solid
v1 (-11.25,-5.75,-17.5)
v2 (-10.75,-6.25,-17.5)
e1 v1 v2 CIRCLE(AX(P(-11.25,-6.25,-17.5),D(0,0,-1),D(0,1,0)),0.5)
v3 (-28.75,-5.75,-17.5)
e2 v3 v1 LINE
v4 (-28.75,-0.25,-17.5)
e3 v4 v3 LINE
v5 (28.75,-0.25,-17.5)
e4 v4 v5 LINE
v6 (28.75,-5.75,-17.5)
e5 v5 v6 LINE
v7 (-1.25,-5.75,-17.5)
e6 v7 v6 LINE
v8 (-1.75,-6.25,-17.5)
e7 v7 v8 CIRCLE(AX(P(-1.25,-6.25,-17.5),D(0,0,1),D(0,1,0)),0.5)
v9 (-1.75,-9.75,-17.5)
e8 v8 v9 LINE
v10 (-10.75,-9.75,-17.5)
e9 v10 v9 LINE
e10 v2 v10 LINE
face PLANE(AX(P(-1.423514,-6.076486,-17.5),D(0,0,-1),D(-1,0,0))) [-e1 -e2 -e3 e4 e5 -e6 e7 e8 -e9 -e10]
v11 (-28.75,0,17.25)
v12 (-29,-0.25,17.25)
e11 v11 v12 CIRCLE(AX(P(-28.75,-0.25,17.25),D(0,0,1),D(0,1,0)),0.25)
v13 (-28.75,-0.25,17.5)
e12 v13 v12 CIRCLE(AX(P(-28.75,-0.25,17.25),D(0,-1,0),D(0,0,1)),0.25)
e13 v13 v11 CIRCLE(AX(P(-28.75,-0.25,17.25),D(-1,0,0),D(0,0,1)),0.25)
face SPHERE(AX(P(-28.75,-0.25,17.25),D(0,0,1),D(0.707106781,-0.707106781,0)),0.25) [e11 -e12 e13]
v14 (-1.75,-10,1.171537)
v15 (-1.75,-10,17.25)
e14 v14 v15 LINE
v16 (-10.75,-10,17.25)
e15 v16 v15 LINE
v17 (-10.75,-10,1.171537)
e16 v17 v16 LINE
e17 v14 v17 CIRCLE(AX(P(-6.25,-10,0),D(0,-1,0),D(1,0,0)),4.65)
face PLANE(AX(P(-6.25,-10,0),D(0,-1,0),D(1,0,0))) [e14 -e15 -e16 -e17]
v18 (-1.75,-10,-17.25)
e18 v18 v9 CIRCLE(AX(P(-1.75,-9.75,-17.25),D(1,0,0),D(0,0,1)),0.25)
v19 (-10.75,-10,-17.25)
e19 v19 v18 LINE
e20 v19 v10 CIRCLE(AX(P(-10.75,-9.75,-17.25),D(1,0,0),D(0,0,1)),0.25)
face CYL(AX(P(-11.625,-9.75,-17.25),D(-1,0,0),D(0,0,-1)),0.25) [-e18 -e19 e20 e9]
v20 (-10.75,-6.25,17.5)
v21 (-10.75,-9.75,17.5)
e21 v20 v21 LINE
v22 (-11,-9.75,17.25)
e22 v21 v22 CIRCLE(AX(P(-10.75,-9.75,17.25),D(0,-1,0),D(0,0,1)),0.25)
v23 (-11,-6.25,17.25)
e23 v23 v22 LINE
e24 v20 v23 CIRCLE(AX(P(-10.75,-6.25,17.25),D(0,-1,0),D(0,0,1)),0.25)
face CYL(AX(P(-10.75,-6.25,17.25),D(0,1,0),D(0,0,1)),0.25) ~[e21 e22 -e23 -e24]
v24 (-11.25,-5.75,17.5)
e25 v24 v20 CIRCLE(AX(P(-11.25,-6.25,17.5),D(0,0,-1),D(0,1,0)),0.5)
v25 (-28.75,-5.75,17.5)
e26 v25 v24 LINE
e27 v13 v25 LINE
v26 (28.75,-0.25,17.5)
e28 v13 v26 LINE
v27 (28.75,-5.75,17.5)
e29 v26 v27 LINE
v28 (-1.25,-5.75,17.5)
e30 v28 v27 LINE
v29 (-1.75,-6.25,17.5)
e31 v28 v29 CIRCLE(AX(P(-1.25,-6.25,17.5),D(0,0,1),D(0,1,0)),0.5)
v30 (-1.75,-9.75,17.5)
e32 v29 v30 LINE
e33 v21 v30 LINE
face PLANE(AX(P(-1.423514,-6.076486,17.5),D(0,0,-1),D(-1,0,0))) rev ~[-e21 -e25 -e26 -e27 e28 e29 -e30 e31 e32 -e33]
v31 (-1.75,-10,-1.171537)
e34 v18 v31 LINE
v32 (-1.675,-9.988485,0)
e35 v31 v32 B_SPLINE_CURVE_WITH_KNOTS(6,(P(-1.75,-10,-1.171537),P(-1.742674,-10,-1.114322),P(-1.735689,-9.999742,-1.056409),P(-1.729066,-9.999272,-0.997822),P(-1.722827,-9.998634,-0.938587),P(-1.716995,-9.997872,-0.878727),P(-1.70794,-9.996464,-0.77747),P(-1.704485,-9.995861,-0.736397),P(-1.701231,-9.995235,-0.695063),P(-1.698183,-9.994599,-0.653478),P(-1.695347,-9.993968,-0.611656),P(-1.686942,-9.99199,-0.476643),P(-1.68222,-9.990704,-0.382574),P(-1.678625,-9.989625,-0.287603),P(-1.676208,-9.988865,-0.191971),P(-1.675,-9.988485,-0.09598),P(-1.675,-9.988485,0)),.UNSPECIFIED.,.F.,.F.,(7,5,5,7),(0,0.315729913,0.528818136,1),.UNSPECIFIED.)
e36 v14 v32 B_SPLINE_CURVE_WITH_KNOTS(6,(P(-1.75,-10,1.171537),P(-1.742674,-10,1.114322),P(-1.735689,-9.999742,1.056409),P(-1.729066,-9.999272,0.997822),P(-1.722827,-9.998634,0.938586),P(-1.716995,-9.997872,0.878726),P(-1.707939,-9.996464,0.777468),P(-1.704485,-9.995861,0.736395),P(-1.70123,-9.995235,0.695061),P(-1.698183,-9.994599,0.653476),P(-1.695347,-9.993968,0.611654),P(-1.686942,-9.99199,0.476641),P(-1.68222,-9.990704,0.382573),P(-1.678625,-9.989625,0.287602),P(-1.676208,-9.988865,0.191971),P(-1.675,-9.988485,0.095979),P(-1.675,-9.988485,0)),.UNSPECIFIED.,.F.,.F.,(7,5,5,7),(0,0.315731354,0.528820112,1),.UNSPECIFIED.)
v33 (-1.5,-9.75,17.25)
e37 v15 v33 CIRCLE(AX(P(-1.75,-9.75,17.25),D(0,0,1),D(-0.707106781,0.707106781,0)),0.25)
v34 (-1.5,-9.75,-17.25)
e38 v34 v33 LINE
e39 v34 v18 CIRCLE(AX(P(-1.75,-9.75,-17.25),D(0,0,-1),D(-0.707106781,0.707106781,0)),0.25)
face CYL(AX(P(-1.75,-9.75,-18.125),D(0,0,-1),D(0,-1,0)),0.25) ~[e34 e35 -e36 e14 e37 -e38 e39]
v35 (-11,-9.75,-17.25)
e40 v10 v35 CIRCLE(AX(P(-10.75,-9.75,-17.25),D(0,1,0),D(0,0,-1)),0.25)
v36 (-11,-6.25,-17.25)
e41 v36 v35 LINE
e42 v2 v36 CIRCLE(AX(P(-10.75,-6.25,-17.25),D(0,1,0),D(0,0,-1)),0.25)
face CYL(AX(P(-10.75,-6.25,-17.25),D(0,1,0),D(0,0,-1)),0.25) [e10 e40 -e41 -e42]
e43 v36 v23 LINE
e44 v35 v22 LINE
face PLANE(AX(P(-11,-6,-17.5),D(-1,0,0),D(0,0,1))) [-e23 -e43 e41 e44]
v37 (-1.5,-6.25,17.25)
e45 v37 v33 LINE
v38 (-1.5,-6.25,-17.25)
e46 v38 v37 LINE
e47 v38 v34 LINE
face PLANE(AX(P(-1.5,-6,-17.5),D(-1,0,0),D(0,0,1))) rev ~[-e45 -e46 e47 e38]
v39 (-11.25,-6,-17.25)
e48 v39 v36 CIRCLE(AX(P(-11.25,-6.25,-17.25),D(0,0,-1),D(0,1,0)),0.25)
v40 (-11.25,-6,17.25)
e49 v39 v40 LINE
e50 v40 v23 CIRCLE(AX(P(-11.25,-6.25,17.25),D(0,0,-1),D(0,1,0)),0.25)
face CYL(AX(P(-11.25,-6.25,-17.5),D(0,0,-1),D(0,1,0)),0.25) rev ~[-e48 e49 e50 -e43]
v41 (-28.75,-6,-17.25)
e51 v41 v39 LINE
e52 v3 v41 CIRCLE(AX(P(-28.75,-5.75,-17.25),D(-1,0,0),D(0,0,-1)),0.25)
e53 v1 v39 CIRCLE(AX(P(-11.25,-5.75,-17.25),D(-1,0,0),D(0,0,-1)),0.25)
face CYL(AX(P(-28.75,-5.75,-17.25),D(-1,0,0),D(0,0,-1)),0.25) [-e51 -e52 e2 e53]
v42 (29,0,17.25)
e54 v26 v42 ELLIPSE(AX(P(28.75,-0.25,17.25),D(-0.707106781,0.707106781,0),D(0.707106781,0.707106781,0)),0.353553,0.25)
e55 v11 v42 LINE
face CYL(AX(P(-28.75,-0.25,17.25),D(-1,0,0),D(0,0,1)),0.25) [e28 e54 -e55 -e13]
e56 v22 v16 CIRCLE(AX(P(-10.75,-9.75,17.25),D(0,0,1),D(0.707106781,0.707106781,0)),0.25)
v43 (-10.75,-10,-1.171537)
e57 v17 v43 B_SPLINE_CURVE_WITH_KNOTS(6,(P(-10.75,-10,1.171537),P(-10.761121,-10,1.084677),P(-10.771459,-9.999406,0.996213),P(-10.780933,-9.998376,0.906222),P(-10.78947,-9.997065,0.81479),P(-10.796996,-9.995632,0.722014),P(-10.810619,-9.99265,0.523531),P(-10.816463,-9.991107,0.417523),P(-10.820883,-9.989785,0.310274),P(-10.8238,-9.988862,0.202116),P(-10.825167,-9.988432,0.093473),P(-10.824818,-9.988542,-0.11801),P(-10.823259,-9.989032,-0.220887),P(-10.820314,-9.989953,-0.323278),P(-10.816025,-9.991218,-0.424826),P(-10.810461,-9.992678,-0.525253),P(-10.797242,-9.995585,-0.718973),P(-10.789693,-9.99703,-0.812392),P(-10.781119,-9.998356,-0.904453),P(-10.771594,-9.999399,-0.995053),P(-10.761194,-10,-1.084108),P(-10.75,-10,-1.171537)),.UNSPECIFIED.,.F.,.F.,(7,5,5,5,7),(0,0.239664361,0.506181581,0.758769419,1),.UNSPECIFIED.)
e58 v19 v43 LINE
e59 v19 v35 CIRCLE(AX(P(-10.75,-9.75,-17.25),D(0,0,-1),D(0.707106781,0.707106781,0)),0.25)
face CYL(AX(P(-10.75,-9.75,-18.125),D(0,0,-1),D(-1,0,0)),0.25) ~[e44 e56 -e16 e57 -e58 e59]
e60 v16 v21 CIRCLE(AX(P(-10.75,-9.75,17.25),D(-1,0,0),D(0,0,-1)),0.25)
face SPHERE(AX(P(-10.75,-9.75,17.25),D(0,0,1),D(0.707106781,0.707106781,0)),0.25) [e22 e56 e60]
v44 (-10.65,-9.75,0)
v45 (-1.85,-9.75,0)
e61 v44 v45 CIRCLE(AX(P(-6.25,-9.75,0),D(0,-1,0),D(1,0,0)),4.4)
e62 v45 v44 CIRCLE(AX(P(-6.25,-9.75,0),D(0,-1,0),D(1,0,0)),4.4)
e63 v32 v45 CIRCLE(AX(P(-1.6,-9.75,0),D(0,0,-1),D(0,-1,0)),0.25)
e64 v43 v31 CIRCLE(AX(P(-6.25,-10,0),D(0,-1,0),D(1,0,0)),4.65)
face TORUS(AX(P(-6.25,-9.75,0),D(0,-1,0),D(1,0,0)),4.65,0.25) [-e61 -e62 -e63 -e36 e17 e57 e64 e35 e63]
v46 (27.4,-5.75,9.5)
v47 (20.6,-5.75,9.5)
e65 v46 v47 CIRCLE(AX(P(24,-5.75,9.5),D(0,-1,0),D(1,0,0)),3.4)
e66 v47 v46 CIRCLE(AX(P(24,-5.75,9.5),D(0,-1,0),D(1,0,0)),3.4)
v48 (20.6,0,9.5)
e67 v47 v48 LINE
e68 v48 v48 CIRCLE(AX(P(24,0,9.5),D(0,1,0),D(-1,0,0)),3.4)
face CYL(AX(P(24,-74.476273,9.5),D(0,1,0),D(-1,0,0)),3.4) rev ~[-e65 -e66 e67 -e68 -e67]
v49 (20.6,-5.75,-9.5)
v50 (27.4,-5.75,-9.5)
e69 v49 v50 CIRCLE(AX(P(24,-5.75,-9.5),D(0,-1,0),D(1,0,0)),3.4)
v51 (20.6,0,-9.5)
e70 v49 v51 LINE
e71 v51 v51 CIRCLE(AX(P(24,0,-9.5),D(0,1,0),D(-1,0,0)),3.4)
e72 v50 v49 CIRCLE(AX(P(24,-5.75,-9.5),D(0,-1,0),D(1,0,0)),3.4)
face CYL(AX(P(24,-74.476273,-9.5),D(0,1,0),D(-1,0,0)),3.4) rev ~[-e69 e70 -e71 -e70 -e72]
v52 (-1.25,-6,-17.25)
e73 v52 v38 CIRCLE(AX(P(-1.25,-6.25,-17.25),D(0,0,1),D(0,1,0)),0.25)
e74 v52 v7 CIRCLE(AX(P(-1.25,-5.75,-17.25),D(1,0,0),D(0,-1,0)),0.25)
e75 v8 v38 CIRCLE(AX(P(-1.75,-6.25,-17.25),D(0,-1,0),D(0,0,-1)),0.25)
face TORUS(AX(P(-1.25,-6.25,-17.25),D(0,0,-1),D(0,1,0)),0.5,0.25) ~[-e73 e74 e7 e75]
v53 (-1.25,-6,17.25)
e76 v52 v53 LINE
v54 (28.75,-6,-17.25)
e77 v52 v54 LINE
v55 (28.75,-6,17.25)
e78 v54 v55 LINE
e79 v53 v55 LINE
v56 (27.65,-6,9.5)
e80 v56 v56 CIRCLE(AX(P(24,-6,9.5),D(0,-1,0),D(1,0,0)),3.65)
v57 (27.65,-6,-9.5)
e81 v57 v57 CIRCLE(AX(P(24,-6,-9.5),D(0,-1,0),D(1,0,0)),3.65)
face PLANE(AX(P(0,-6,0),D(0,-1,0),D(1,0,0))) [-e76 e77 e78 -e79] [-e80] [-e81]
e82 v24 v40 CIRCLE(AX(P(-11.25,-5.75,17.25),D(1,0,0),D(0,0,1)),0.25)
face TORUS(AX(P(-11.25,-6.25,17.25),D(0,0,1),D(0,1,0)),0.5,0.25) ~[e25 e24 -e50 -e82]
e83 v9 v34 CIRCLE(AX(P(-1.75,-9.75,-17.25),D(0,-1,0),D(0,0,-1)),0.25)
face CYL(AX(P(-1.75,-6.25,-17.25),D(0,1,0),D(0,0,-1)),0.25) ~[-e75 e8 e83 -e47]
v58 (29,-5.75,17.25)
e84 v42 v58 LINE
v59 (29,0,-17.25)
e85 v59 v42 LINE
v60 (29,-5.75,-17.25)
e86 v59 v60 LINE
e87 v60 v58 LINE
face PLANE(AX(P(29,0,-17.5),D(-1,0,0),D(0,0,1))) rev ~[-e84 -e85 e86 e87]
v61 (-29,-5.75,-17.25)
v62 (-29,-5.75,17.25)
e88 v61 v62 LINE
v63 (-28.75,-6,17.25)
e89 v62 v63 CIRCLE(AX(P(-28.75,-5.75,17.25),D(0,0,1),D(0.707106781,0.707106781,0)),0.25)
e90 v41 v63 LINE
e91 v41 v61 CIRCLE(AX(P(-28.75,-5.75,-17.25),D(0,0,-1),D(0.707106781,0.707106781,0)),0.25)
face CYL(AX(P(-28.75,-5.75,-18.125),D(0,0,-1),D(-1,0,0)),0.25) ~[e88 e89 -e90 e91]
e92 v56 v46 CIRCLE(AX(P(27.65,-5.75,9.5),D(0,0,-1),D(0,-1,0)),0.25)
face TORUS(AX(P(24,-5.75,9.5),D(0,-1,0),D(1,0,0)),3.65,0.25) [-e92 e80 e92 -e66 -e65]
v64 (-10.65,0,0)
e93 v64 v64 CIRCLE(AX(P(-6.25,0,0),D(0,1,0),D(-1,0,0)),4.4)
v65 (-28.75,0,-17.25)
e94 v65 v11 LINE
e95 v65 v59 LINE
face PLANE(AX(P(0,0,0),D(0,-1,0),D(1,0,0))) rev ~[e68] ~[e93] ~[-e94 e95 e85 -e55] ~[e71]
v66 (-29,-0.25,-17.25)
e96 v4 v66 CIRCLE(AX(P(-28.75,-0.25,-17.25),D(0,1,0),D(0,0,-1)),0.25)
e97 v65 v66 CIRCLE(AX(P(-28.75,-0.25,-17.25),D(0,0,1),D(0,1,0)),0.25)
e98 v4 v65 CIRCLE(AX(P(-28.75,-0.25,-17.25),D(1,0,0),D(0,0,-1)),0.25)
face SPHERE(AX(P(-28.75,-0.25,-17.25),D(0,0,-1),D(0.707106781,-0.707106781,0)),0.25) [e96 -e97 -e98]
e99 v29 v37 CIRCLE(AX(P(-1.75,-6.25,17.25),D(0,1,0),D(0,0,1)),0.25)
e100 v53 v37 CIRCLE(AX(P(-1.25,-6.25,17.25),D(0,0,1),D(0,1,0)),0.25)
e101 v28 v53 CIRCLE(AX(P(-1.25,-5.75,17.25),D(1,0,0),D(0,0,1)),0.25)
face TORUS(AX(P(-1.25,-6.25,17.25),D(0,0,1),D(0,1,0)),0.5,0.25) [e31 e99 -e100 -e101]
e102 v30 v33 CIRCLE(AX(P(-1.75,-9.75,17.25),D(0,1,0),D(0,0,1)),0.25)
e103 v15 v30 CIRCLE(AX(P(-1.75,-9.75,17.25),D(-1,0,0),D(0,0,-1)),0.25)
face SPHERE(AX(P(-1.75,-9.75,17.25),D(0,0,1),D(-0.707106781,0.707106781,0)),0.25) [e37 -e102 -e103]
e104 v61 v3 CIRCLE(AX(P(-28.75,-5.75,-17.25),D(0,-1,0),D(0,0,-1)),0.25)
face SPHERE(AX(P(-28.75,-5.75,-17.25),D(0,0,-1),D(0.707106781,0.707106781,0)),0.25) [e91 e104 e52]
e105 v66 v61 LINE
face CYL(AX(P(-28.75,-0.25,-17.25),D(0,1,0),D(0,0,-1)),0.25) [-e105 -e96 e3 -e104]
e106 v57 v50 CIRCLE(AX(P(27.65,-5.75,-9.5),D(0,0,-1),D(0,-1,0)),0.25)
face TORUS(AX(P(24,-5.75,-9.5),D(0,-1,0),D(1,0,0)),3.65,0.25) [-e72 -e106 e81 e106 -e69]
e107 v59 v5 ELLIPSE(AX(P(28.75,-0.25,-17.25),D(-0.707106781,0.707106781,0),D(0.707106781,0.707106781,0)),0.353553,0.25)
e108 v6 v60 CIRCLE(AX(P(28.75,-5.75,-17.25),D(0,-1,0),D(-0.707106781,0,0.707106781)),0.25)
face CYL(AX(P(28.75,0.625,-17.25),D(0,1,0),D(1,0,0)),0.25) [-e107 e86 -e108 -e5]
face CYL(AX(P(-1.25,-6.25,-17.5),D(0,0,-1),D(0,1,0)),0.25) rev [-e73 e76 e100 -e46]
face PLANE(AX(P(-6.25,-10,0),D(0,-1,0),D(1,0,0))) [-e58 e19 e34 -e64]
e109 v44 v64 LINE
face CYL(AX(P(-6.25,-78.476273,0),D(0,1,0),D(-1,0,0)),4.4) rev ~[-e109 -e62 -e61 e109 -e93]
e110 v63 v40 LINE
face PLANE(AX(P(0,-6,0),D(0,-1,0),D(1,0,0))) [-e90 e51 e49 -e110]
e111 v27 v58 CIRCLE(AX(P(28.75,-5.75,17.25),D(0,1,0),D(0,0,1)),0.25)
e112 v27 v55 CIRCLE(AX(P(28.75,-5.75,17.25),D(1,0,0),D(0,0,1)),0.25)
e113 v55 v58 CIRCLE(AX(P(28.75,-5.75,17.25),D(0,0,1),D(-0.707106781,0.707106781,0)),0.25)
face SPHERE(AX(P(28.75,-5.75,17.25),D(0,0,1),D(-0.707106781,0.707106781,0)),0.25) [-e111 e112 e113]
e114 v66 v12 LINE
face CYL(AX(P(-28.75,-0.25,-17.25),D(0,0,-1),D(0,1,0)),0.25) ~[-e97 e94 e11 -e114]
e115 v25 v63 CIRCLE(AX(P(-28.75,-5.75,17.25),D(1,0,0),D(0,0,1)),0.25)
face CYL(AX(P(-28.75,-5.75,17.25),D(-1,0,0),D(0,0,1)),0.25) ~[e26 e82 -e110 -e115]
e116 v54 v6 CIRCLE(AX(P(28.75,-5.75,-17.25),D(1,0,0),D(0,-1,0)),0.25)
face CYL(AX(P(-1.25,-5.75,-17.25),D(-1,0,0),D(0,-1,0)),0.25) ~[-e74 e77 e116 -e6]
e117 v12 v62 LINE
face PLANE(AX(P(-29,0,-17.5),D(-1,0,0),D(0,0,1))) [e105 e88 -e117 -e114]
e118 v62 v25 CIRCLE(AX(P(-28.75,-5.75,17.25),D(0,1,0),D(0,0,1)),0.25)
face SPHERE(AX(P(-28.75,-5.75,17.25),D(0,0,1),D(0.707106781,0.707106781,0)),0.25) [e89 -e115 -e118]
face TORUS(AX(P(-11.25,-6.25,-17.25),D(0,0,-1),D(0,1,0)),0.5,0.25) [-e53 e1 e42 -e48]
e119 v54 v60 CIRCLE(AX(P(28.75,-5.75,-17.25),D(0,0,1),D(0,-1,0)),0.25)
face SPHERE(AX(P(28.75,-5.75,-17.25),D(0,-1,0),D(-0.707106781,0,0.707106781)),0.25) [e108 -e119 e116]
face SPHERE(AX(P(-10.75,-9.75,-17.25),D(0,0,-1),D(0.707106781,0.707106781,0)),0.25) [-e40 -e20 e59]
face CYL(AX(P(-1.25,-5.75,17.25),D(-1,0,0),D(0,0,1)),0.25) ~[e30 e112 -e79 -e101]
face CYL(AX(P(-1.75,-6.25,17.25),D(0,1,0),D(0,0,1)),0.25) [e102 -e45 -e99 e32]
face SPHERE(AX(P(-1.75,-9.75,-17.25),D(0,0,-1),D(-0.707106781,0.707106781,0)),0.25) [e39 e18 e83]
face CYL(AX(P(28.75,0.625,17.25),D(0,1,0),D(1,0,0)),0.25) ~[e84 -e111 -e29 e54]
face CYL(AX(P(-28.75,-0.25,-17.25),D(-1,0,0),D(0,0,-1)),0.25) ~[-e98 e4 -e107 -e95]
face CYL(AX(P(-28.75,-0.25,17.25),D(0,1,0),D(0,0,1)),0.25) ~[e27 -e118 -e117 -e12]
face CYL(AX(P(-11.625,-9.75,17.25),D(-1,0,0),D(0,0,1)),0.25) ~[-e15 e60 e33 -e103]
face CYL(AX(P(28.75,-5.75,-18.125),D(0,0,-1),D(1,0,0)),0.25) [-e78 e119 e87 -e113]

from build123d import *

# Parameters (mm, degrees)
F0_W         = 58
F0_H         = 35
F1_DEPTH     = 6
F2_W         = 9.5
F2_H         = 35
F3_DEPTH     = 4
F4_D         = 6.8
F6_D         = 8.8
F7_T1_DEPTH  = 35
F7_T3_DEPTH  = 36.25
F7_T5_DEPTH  = 10.75
F7_T7_DEPTH  = 7.25
F7_T9_DEPTH  = 6.375
F7_T11_DEPTH = 58.375
F7_T13_DEPTH = 34.5
F7_S17_W     = 0.25
F7_S17_H     = 0.25
F7_T18_DEPTH = 0.25
F7_S23_W     = 0.25
F7_S23_H     = 0.25
F7_T24_DEPTH = 0.25
F7_T33_DEPTH = 30
F7_T35_DEPTH = 17.5
F7_T37_DEPTH = 3.5
F7_S41_W     = 0.25
F7_S41_H     = 0.25
F7_T42_DEPTH = 0.25
F7_S47_W     = 0.25
F7_S47_H     = 0.25
F7_T48_DEPTH = 0.25
F7_S53_W     = 0.25
F7_S53_H     = 0.25
F7_T54_DEPTH = 0.25
F7_S59_W     = 0.25
F7_S59_H     = 0.25
F7_T60_DEPTH = 0.25
F7_S65_W     = 0.25
F7_S65_H     = 0.25
F7_T66_DEPTH = 0.25
F7_S71_W     = 0.25
F7_S71_H     = 0.25
F7_T72_DEPTH = 0.25
F7_S77_W     = 0.25
F7_S77_H     = 0.25
F7_T78_DEPTH = 0.25
F7_S83_W     = 0.25
F7_S83_H     = 0.25
F7_T84_DEPTH = 0.25
F7_T88_ANGLE = 90
F7_T90_ANGLE = 90
F7_T92_ANGLE = 90
F7_T94_ANGLE = 90


# Not quite as in the source:
# - a fillet or chamfer that OpenCascade refuses, or shapes differently, is made with other operations: its cross-section is extruded or revolved along the edge and cut away or added


with BuildPart() as f1:
    # F0 (on Front) → F1 (new body)
    with BuildSketch(Plane.XZ):
        Rectangle(F0_W, F0_H)
    extrude(amount=F1_DEPTH)

    # F2 (on face) → F3 (join)
    with BuildSketch(Plane.XZ.offset(6)):
        with Locations((-6.25, 0)):
            Rectangle(F2_W, F2_H)
    extrude(amount=F3_DEPTH)

    # F4 (through all)
    with Locations(Plane.XZ.offset(6)):
        with Locations((24, 9.5), (24, -9.5)):
            Hole(F4_D / 2)

    # F6 (through all)
    with Locations(Plane.XZ.offset(10)):
        with Locations((-6.25, 0)):
            Hole(F6_D / 2)

    # F7: fillet of radius 0.25 on 26 edges, made by hand

    # F7_s2 → F7_t1 (join)
    with BuildSketch(Plane.XY.offset(-17.5)):
        with BuildLine():
            ThreePointArc((-1.25, -6), (-1.4267766953, -6.0732233047), (-1.5, -6.25))
            Line((-1.5, -6.25), (-1.5, -6))
            Line((-1.5, -6), (-1.25, -6))
        make_face()
        with BuildLine():
            ThreePointArc((-11.25, -6), (-11.0732233047, -6.0732233047), (-11, -6.25))
            Line((-11, -6.25), (-11, -6))
            Line((-11, -6), (-11.25, -6))
        make_face()
    extrude(amount=F7_T1_DEPTH)

    # F7_s4 → F7_t3 (cut)
    with BuildSketch(Plane.XY.offset(-18.125)):
        with BuildLine():
            ThreePointArc((29, -5.75), (28.9267766953, -5.9267766953), (28.75, -6))
            Line((28.75, -6), (29, -6))
            Line((29, -6), (29, -5.75))
        make_face()
        with BuildLine():
            ThreePointArc((-11, -9.75), (-10.9267766953, -9.9267766953), (-10.75, -10))
            Line((-10.75, -10), (-11, -10))
            Line((-11, -10), (-11, -9.75))
        make_face()
        with BuildLine():
            ThreePointArc((-1.75, -10), (-1.5732233047, -9.9267766953), (-1.5, -9.75))
            Line((-1.5, -9.75), (-1.5, -10))
            Line((-1.5, -10), (-1.75, -10))
        make_face()
        with BuildLine():
            ThreePointArc((-29, -5.75), (-28.9267766953, -5.9267766953), (-28.75, -6))
            Line((-28.75, -6), (-29, -6))
            Line((-29, -6), (-29, -5.75))
        make_face()
    extrude(amount=F7_T3_DEPTH, mode=Mode.SUBTRACT)

    # F7_s6 → F7_t5 (cut)
    with BuildSketch(Plane.YZ.offset(-11.625)):
        with BuildLine():
            ThreePointArc((-9.75, 17.5), (-9.9267766953, 17.4267766953), (-10, 17.25))
            Line((-10, 17.25), (-10, 17.5))
            Line((-10, 17.5), (-9.75, 17.5))
        make_face()
        with BuildLine():
            ThreePointArc((-9.75, -17.5), (-9.9267766953, -17.4267766953), (-10, -17.25))
            Line((-10, -17.25), (-10, -17.5))
            Line((-10, -17.5), (-9.75, -17.5))
        make_face()
    extrude(amount=F7_T5_DEPTH, mode=Mode.SUBTRACT)

    # F7_s8 → F7_t7 (cut)
    with BuildSketch(Plane.XZ.offset(-0.625)):
        with BuildLine():
            ThreePointArc((29, 17.25), (28.9267766953, 17.4267766953), (28.75, 17.5))
            Line((28.75, 17.5), (29, 17.5))
            Line((29, 17.5), (29, 17.25))
        make_face()
        with BuildLine():
            ThreePointArc((29, -17.25), (28.9267766953, -17.4267766953), (28.75, -17.5))
            Line((28.75, -17.5), (29, -17.5))
            Line((29, -17.5), (29, -17.25))
        make_face()
    extrude(amount=F7_T7_DEPTH, mode=Mode.SUBTRACT)

    # F7_s10 → F7_t9 (cut)
    with BuildSketch(Plane.XZ.offset(0.25)):
        with BuildLine():
            ThreePointArc((-28.75, 17.5), (-28.9267766953, 17.4267766953), (-29, 17.25))
            Line((-29, 17.25), (-29, 17.5))
            Line((-29, 17.5), (-28.75, 17.5))
        make_face()
        with BuildLine():
            ThreePointArc((-28.75, -17.5), (-28.9267766953, -17.4267766953), (-29, -17.25))
            Line((-29, -17.25), (-29, -17.5))
            Line((-29, -17.5), (-28.75, -17.5))
        make_face()
    extrude(amount=F7_T9_DEPTH, mode=Mode.SUBTRACT)

    # F7_s12 → F7_t11 (cut)
    with BuildSketch(Plane.YZ.offset(-28.75)):
        with BuildLine():
            ThreePointArc((-0.25, 17.5), (-0.0732233047, 17.4267766953), (0, 17.25))
            Line((0, 17.25), (0, 17.5))
            Line((0, 17.5), (-0.25, 17.5))
        make_face()
        with BuildLine():
            ThreePointArc((-0.25, -17.5), (-0.0732233047, -17.4267766953), (0, -17.25))
            Line((0, -17.25), (0, -17.5))
            Line((0, -17.5), (-0.25, -17.5))
        make_face()
    extrude(amount=F7_T11_DEPTH, mode=Mode.SUBTRACT)

    # F7_s14 → F7_t13 (cut)
    with BuildSketch(Plane.XY.offset(-17.25)):
        with BuildLine():
            ThreePointArc((-28.75, 0), (-28.9267766953, -0.0732233047), (-29, -0.25))
            Line((-29, -0.25), (-29, 0))
            Line((-29, 0), (-28.75, 0))
        make_face()
    extrude(amount=F7_T13_DEPTH, mode=Mode.SUBTRACT)


with BuildPart() as f7_tool16:
    # F7_s17 → F7_t18 (new body)
    with BuildSketch(Plane.XY.offset(17.25)):
        with Locations((-28.875, -0.125)):
            Rectangle(F7_S17_W, F7_S17_H)
    extrude(amount=F7_T18_DEPTH)

    # F7_s19 → F7_t20 (revolve, cut)
    with BuildSketch(Plane(origin=(-28.75, -0.25, 17.25), x_dir=(0.7071067812, -0.7071067812, 0), z_dir=(-0.7071067812, -0.7071067812, 0))):
        with BuildLine():
            ThreePointArc((0, -0.25), (0.25, 0), (0, 0.25))
            Line((0, 0.25), (0, -0.25))
        make_face()
    revolve(axis=Axis((-28.75, -0.25, 17.25), (0, 0, 1)), mode=Mode.SUBTRACT)


with BuildPart() as f1_1:
    add(f1.part)

    # F7_t15: cut F7_tool16
    add(f7_tool16.part, mode=Mode.SUBTRACT)


with BuildPart() as f7_tool22:
    # F7_s23 → F7_t24 (new body)
    with BuildSketch(Plane.XY.offset(-17.25)):
        with Locations((-28.875, -0.125)):
            Rectangle(F7_S23_W, F7_S23_H)
    extrude(amount=-F7_T24_DEPTH)

    # F7_s25 → F7_t26 (revolve, cut)
    with BuildSketch(Plane(origin=(-28.75, -0.25, -17.25), x_dir=(0.7071067812, -0.7071067812, 0), z_dir=(0.7071067812, 0.7071067812, 0))):
        with BuildLine():
            ThreePointArc((0, -0.25), (0.25, 0), (0, 0.25))
            Line((0, 0.25), (0, -0.25))
        make_face()
    revolve(axis=Axis((-28.75, -0.25, -17.25), (0, 0, -1)), mode=Mode.SUBTRACT)


with BuildPart() as f1_2:
    add(f1_1.part)

    # F7_t21: cut F7_tool22
    add(f7_tool22.part, mode=Mode.SUBTRACT)

    # F7_s27 → F7_t28 (revolve, cut)
    with BuildSketch(Plane.XY.offset(-9.5)):
        with BuildLine():
            ThreePointArc((27.65, -6), (27.4732233047, -5.9267766953), (27.4, -5.75))
            Line((27.4, -5.75), (27.4, -6))
            Line((27.4, -6), (27.65, -6))
        make_face()
    revolve(axis=Axis((24, -6, -9.5), (0, -1, 0)), mode=Mode.SUBTRACT)

    # F7_s29 → F7_t30 (revolve, cut)
    with BuildSketch(Plane.XY.offset(9.5)):
        with BuildLine():
            ThreePointArc((27.65, -6), (27.4732233047, -5.9267766953), (27.4, -5.75))
            Line((27.4, -5.75), (27.4, -6))
            Line((27.4, -6), (27.65, -6))
        make_face()
    revolve(axis=Axis((24, -6, 9.5), (0, -1, 0)), mode=Mode.SUBTRACT)

    # F7_s31 → F7_t32 (revolve, cut)
    with BuildSketch(Plane.XY):
        with BuildLine():
            ThreePointArc((-1.6, -10), (-1.7767766953, -9.9267766953), (-1.85, -9.75))
            Line((-1.85, -9.75), (-1.85, -10))
            Line((-1.85, -10), (-1.6, -10))
        make_face()
    revolve(axis=Axis((-6.25, -10, 0), (0, -1, 0)), mode=Mode.SUBTRACT)

    # F7_s34 → F7_t33 (cut)
    with BuildSketch(Plane.YZ.offset(-1.25)):
        with BuildLine():
            ThreePointArc((-6, -17.25), (-5.9267766953, -17.4267766953), (-5.75, -17.5))
            Line((-5.75, -17.5), (-6, -17.5))
            Line((-6, -17.5), (-6, -17.25))
        make_face()
        with BuildLine():
            ThreePointArc((-5.75, 17.5), (-5.9267766953, 17.4267766953), (-6, 17.25))
            Line((-6, 17.25), (-6, 17.5))
            Line((-6, 17.5), (-5.75, 17.5))
        make_face()
    extrude(amount=F7_T33_DEPTH, mode=Mode.SUBTRACT)

    # F7_s36 → F7_t35 (cut)
    with BuildSketch(Plane.YZ.offset(-28.75)):
        with BuildLine():
            ThreePointArc((-5.75, -17.5), (-5.9267766953, -17.4267766953), (-6, -17.25))
            Line((-6, -17.25), (-6, -17.5))
            Line((-6, -17.5), (-5.75, -17.5))
        make_face()
        with BuildLine():
            ThreePointArc((-5.75, 17.5), (-5.9267766953, 17.4267766953), (-6, 17.25))
            Line((-6, 17.25), (-6, 17.5))
            Line((-6, 17.5), (-5.75, 17.5))
        make_face()
    extrude(amount=F7_T35_DEPTH, mode=Mode.SUBTRACT)

    # F7_s38 → F7_t37 (cut)
    with BuildSketch(Plane.XZ.offset(6.25)):
        with BuildLine():
            ThreePointArc((-1.75, 17.5), (-1.5732233047, 17.4267766953), (-1.5, 17.25))
            Line((-1.5, 17.25), (-1.5, 17.5))
            Line((-1.5, 17.5), (-1.75, 17.5))
        make_face()
        with BuildLine():
            ThreePointArc((-10.75, 17.5), (-10.9267766953, 17.4267766953), (-11, 17.25))
            Line((-11, 17.25), (-11, 17.5))
            Line((-11, 17.5), (-10.75, 17.5))
        make_face()
        with BuildLine():
            ThreePointArc((-10.75, -17.5), (-10.9267766953, -17.4267766953), (-11, -17.25))
            Line((-11, -17.25), (-11, -17.5))
            Line((-11, -17.5), (-10.75, -17.5))
        make_face()
        with BuildLine():
            ThreePointArc((-1.75, -17.5), (-1.5732233047, -17.4267766953), (-1.5, -17.25))
            Line((-1.5, -17.25), (-1.5, -17.5))
            Line((-1.5, -17.5), (-1.75, -17.5))
        make_face()
    extrude(amount=F7_T37_DEPTH, mode=Mode.SUBTRACT)


with BuildPart() as f7_tool40:
    # F7_s41 → F7_t42 (new body)
    with BuildSketch(Plane.XY.offset(-17.25)):
        with Locations((-1.625, -9.875)):
            Rectangle(F7_S41_W, F7_S41_H)
    extrude(amount=-F7_T42_DEPTH)

    # F7_s43 → F7_t44 (revolve, cut)
    with BuildSketch(Plane(origin=(-1.75, -9.75, -17.25), x_dir=(-0.7071067812, 0.7071067812, 0), z_dir=(-0.7071067812, -0.7071067812, 0))):
        with BuildLine():
            ThreePointArc((0, -0.25), (0.25, 0), (0, 0.25))
            Line((0, 0.25), (0, -0.25))
        make_face()
    revolve(axis=Axis((-1.75, -9.75, -17.25), (0, 0, -1)), mode=Mode.SUBTRACT)


with BuildPart() as f1_3:
    add(f1_2.part)

    # F7_t39: cut F7_tool40
    add(f7_tool40.part, mode=Mode.SUBTRACT)


with BuildPart() as f7_tool46:
    # F7_s47 → F7_t48 (new body)
    with BuildSketch(Plane.XY.offset(-17.25)):
        with Locations((-10.875, -9.875)):
            Rectangle(F7_S47_W, F7_S47_H)
    extrude(amount=-F7_T48_DEPTH)

    # F7_s49 → F7_t50 (revolve, cut)
    with BuildSketch(Plane(origin=(-10.75, -9.75, -17.25), x_dir=(0.7071067812, 0.7071067812, 0), z_dir=(-0.7071067812, 0.7071067812, 0))):
        with BuildLine():
            ThreePointArc((0, -0.25), (0.25, 0), (0, 0.25))
            Line((0, 0.25), (0, -0.25))
        make_face()
    revolve(axis=Axis((-10.75, -9.75, -17.25), (0, 0, -1)), mode=Mode.SUBTRACT)


with BuildPart() as f1_4:
    add(f1_3.part)

    # F7_t45: cut F7_tool46
    add(f7_tool46.part, mode=Mode.SUBTRACT)


with BuildPart() as f7_tool52:
    # F7_s53 → F7_t54 (new body)
    with BuildSketch(Plane.XY.offset(17.25)):
        with Locations((-10.875, -9.875)):
            Rectangle(F7_S53_W, F7_S53_H)
    extrude(amount=F7_T54_DEPTH)

    # F7_s55 → F7_t56 (revolve, cut)
    with BuildSketch(Plane(origin=(-10.75, -9.75, 17.25), x_dir=(0.7071067812, 0.7071067812, 0), z_dir=(0.7071067812, -0.7071067812, 0))):
        with BuildLine():
            ThreePointArc((0, -0.25), (0.25, 0), (0, 0.25))
            Line((0, 0.25), (0, -0.25))
        make_face()
    revolve(axis=Axis((-10.75, -9.75, 17.25), (0, 0, 1)), mode=Mode.SUBTRACT)


with BuildPart() as f1_5:
    add(f1_4.part)

    # F7_t51: cut F7_tool52
    add(f7_tool52.part, mode=Mode.SUBTRACT)


with BuildPart() as f7_tool58:
    # F7_s59 → F7_t60 (new body)
    with BuildSketch(Plane.XY.offset(17.25)):
        with Locations((-1.625, -9.875)):
            Rectangle(F7_S59_W, F7_S59_H)
    extrude(amount=F7_T60_DEPTH)

    # F7_s61 → F7_t62 (revolve, cut)
    with BuildSketch(Plane(origin=(-1.75, -9.75, 17.25), x_dir=(-0.7071067812, 0.7071067812, 0), z_dir=(0.7071067812, 0.7071067812, 0))):
        with BuildLine():
            ThreePointArc((0, -0.25), (0.25, 0), (0, 0.25))
            Line((0, 0.25), (0, -0.25))
        make_face()
    revolve(axis=Axis((-1.75, -9.75, 17.25), (0, 0, 1)), mode=Mode.SUBTRACT)


with BuildPart() as f1_6:
    add(f1_5.part)

    # F7_t57: cut F7_tool58
    add(f7_tool58.part, mode=Mode.SUBTRACT)


with BuildPart() as f7_tool64:
    # F7_s65 → F7_t66 (new body)
    with BuildSketch(Plane.XY.offset(17.25)):
        with Locations((-28.875, -5.875)):
            Rectangle(F7_S65_W, F7_S65_H)
    extrude(amount=F7_T66_DEPTH)

    # F7_s67 → F7_t68 (revolve, cut)
    with BuildSketch(Plane(origin=(-28.75, -5.75, 17.25), x_dir=(0.7071067812, 0.7071067812, 0), z_dir=(0.7071067812, -0.7071067812, 0))):
        with BuildLine():
            ThreePointArc((0, -0.25), (0.25, 0), (0, 0.25))
            Line((0, 0.25), (0, -0.25))
        make_face()
    revolve(axis=Axis((-28.75, -5.75, 17.25), (0, 0, 1)), mode=Mode.SUBTRACT)


with BuildPart() as f1_7:
    add(f1_6.part)

    # F7_t63: cut F7_tool64
    add(f7_tool64.part, mode=Mode.SUBTRACT)


with BuildPart() as f7_tool70:
    # F7_s71 → F7_t72 (new body)
    with BuildSketch(Plane.XY.offset(-17.25)):
        with Locations((-28.875, -5.875)):
            Rectangle(F7_S71_W, F7_S71_H)
    extrude(amount=-F7_T72_DEPTH)

    # F7_s73 → F7_t74 (revolve, cut)
    with BuildSketch(Plane(origin=(-28.75, -5.75, -17.25), x_dir=(0.7071067812, 0.7071067812, 0), z_dir=(-0.7071067812, 0.7071067812, 0))):
        with BuildLine():
            ThreePointArc((0, -0.25), (0.25, 0), (0, 0.25))
            Line((0, 0.25), (0, -0.25))
        make_face()
    revolve(axis=Axis((-28.75, -5.75, -17.25), (0, 0, -1)), mode=Mode.SUBTRACT)


with BuildPart() as f1_8:
    add(f1_7.part)

    # F7_t69: cut F7_tool70
    add(f7_tool70.part, mode=Mode.SUBTRACT)


with BuildPart() as f7_tool76:
    # F7_s77 → F7_t78 (new body)
    with BuildSketch(Plane.XY.offset(17.25)):
        with Locations((28.875, -5.875)):
            Rectangle(F7_S77_W, F7_S77_H)
    extrude(amount=F7_T78_DEPTH)

    # F7_s79 → F7_t80 (revolve, cut)
    with BuildSketch(Plane(origin=(28.75, -5.75, 17.25), x_dir=(-0.7071067812, 0.7071067812, 0), z_dir=(0.7071067812, 0.7071067812, 0))):
        with BuildLine():
            ThreePointArc((0, -0.25), (0.25, 0), (0, 0.25))
            Line((0, 0.25), (0, -0.25))
        make_face()
    revolve(axis=Axis((28.75, -5.75, 17.25), (0, 0, 1)), mode=Mode.SUBTRACT)


with BuildPart() as f1_9:
    add(f1_8.part)

    # F7_t75: cut F7_tool76
    add(f7_tool76.part, mode=Mode.SUBTRACT)


with BuildPart() as f7_tool82:
    # F7_s83 → F7_t84 (new body)
    with BuildSketch(Plane.XZ.offset(5.75)):
        with Locations((28.875, -17.375)):
            Rectangle(F7_S83_W, F7_S83_H)
    extrude(amount=F7_T84_DEPTH)

    # F7_s85 → F7_t86 (revolve, cut)
    with BuildSketch(Plane(origin=(28.75, -5.75, -17.25), x_dir=(-0.7071067812, 0, 0.7071067812), z_dir=(0.7071067812, 0, 0.7071067812))):
        with BuildLine():
            ThreePointArc((0, -0.25), (0.25, 0), (0, 0.25))
            Line((0, 0.25), (0, -0.25))
        make_face()
    revolve(axis=Axis((28.75, -5.75, -17.25), (0, -1, 0)), mode=Mode.SUBTRACT)


with BuildPart() as f1_10:
    add(f1_9.part)

    # F7_t81: cut F7_tool82
    add(f7_tool82.part, mode=Mode.SUBTRACT)

    # F7_s87 → F7_t88 (revolve, cut)
    with BuildSketch(Plane.YZ.offset(-1.25)):
        with BuildLine():
            ThreePointArc((-5.75, -17.5), (-5.9267766953, -17.4267766953), (-6, -17.25))
            Line((-6, -17.25), (-6, -17.5))
            Line((-6, -17.5), (-5.75, -17.5))
        make_face()
    revolve(axis=Axis((-1.25, -6.25, -17.5), (0, 0, 1)), revolution_arc=F7_T88_ANGLE, mode=Mode.SUBTRACT)

    # F7_s89 → F7_t90 (revolve, cut)
    with BuildSketch(Plane.YZ.offset(-11.25)):
        with BuildLine():
            ThreePointArc((-5.75, -17.5), (-5.9267766953, -17.4267766953), (-6, -17.25))
            Line((-6, -17.25), (-6, -17.5))
            Line((-6, -17.5), (-5.75, -17.5))
        make_face()
    revolve(axis=Axis((-11.25, -6.25, -17.5), (0, 0, -1)), revolution_arc=F7_T90_ANGLE, mode=Mode.SUBTRACT)

    # F7_s91 → F7_t92 (revolve, cut)
    with BuildSketch(Plane.YZ.offset(-11.25)):
        with BuildLine():
            ThreePointArc((-5.75, 17.5), (-5.9267766953, 17.4267766953), (-6, 17.25))
            Line((-6, 17.25), (-6, 17.5))
            Line((-6, 17.5), (-5.75, 17.5))
        make_face()
    revolve(axis=Axis((-11.25, -6.25, 17.5), (0, 0, -1)), revolution_arc=F7_T92_ANGLE, mode=Mode.SUBTRACT)

    # F7_s93 → F7_t94 (revolve, cut)
    with BuildSketch(Plane.YZ.offset(-1.25)):
        with BuildLine():
            ThreePointArc((-5.75, 17.5), (-5.9267766953, 17.4267766953), (-6, 17.25))
            Line((-6, 17.25), (-6, 17.5))
            Line((-6, 17.5), (-5.75, 17.5))
        make_face()
    revolve(axis=Axis((-1.25, -6.25, 17.5), (0, 0, 1)), revolution_arc=F7_T94_ANGLE, mode=Mode.SUBTRACT)


solid = f1_10.part
